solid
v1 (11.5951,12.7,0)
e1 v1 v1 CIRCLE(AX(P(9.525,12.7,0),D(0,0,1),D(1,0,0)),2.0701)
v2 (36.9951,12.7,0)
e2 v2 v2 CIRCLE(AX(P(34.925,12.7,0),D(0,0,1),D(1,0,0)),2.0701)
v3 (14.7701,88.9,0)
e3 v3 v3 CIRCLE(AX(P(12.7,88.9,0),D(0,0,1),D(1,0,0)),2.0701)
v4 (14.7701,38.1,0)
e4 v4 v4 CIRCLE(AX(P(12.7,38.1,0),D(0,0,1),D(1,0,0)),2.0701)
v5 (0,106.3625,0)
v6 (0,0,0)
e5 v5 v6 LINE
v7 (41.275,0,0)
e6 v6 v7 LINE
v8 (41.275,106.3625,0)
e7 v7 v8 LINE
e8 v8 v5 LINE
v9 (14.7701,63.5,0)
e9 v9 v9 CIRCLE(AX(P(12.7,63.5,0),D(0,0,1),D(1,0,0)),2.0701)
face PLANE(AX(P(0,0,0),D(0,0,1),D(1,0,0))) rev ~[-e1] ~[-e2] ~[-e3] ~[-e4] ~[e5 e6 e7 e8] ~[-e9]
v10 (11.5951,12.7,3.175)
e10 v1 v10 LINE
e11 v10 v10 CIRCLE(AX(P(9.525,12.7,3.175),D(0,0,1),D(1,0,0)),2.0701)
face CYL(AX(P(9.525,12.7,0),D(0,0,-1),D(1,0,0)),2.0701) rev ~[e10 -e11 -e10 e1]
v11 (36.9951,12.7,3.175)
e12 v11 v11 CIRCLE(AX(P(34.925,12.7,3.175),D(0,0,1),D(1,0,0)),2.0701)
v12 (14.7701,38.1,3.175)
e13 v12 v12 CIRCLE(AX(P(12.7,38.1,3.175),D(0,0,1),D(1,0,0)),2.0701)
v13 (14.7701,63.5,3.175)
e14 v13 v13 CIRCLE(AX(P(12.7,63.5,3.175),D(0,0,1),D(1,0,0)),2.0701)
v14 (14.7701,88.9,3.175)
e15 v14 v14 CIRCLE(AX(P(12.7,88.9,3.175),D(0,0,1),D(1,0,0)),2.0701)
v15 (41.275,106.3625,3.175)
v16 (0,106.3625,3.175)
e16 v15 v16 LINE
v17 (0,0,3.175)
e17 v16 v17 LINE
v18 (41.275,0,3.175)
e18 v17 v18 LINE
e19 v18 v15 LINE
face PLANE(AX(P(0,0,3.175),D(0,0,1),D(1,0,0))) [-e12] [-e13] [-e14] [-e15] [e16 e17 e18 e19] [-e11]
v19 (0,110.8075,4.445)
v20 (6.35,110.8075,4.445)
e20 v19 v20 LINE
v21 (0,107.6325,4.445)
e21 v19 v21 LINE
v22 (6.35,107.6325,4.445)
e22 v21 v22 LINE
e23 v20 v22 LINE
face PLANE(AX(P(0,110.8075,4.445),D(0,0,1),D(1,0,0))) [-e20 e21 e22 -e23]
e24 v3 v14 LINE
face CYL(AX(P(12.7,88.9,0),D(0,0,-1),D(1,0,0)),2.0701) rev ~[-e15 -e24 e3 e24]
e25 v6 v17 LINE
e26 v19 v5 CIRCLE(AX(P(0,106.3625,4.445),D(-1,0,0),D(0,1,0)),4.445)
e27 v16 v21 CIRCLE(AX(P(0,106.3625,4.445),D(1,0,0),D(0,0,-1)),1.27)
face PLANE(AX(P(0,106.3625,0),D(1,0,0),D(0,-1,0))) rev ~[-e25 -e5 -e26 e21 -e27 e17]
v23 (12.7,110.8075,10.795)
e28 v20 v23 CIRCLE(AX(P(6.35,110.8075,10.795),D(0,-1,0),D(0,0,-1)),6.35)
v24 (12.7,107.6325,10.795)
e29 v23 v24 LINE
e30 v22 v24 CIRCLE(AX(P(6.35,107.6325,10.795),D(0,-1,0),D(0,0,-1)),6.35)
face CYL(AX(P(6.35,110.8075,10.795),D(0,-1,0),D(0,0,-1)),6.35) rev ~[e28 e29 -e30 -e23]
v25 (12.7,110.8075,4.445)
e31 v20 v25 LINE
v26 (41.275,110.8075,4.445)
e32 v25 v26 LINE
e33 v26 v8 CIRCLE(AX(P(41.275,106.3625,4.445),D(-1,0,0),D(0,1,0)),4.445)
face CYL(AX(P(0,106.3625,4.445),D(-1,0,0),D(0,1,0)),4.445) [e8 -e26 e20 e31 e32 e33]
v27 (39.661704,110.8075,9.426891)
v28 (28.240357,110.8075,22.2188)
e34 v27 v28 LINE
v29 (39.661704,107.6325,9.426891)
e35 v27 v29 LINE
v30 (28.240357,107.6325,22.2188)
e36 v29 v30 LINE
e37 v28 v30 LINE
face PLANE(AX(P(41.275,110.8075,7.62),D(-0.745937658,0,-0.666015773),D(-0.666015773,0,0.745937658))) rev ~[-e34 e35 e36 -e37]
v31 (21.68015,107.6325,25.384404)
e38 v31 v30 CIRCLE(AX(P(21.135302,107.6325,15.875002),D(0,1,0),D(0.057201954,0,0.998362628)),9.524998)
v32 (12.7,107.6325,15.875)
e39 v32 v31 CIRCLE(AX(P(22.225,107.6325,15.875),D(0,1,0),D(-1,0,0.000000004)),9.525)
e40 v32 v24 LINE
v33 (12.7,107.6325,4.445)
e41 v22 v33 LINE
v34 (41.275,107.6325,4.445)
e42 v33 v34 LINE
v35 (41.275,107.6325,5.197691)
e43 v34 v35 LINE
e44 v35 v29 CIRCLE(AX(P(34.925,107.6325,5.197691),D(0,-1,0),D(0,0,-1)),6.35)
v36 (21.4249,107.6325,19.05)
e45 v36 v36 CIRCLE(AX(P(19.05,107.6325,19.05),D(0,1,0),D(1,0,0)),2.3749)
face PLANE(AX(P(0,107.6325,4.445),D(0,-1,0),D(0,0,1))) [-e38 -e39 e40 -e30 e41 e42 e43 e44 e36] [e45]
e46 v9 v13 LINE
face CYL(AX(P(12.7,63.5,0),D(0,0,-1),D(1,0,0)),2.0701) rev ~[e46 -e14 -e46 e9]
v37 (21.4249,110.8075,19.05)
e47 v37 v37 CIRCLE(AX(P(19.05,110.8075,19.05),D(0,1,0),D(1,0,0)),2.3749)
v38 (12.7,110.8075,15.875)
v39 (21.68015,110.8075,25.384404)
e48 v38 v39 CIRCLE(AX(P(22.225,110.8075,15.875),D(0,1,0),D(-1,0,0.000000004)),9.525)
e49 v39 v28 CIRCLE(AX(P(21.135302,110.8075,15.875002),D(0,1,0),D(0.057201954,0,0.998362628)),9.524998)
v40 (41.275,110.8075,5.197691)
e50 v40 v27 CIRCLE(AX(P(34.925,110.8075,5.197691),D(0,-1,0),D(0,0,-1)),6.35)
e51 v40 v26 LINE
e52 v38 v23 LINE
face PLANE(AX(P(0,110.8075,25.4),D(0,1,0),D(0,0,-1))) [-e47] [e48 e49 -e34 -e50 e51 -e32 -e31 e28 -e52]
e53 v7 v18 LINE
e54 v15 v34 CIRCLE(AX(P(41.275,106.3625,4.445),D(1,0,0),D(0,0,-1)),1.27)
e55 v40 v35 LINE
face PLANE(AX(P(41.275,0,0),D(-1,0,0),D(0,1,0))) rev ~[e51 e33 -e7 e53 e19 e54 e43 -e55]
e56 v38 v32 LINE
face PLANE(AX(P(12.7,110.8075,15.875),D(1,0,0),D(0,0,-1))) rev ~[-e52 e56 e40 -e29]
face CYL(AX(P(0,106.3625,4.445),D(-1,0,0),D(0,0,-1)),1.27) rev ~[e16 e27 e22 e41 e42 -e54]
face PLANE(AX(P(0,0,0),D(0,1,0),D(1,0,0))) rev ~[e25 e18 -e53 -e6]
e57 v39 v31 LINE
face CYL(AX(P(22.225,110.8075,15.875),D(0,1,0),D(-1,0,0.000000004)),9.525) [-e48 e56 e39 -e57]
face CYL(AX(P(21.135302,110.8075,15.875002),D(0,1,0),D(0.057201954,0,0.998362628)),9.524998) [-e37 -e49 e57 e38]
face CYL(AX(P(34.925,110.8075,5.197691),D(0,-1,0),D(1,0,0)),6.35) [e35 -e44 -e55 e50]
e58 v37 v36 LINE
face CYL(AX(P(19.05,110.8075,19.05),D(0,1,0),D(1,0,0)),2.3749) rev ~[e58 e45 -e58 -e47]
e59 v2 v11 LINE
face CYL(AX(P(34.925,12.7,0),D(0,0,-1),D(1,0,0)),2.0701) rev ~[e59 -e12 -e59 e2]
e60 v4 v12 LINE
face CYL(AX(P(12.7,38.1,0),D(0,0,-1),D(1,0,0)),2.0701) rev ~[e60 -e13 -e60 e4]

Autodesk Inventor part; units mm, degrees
ref_plane "YZ Plane" through (0, 0, 0) normal (1, 0, 0) x (0, 1, 0)
ref_plane "XZ Plane" through (0, 0, 0) normal (0, 1, 0) x (-1, 0, 0)
ref_plane "XY Plane" through (0, 0, 0) normal (0, 0, 1) x (1, 0, 0)
sketch "Sketch1 outline for Plate1" plane through (0, 0, 0) normal (0, 0, 1) x (1, 0, 0)
  line L0 (0, 106.3625) -> (0, 0)
  line L1 (41.275, 106.3625) -> (0, 106.3625)
  line L2 (0, 0) -> (41.275, 0)
  line L3 (41.275, 0) -> (41.275, 106.3625)
  circle A0 centre (9.525, 12.7) radius 2.0701
  circle A1 centre (12.7, 38.1) radius 2.0701
  circle A2 centre (34.925, 12.7) radius 2.0701
  circle A3 centre (12.7, 63.5) radius 2.0701
  circle A4 centre (12.7, 88.9) radius 2.0701
extrude "Plate1" add sketch "Sketch1 outline for Plate1" along normal blind 3.175
sketch "Sketch2" plane through (0, 107.6325, 4.445) normal (0, 1, 0) x (-1, 0, 0)
  line L0 (-41.275, 0) -> (0, 0)
  line L1 (0, 0) -> (0, 20.955)
  line L2 (0, 20.955) -> (-41.275, 20.955)
  line L3 (-41.275, 20.955) -> (-41.275, 0)
edge flange "Flange1" height 25.4 angle 90 thickness 3.175 bend radius 1.27 thickness toward (0, 1, 0) relief tear relief width 3.175 relief depth 1.5875 edges at (20.6375, 106.3625, 3.175) wall of the first edge with corners at (41.275, 107.6325, 4.445) (0, 107.6325, 4.445) (0, 107.6325, 25.4) (41.275, 107.6325, 25.4)
bend "Bend1"
corner "Corner1"
sketch "Sketch1" plane through (0, 0, 0) normal (0, 0, 1) x (1, 0, 0)
  line L0 (110.551814, -41.275) -> (0, -41.275)
  line L1 (110.551814, -34.925) -> (110.551814, -41.275)
  line L2 (0, 0) -> (111.304505, 0)
  line L3 (106.3625, 0) -> (110.551814, 0)
  line L4 (110.551814, 0) -> (110.551814, -3.175)
  line L5 (110.551814, -3.175) -> (106.3625, -3.175)
  line L6 (106.3625, -3.175) -> (106.3625, 0)
  line L7 (106.3625, 0) -> (106.3625, -41.275)
  line L8 (110.551814, 0) -> (110.551814, -34.925)
  line L9 (106.3625, -38.1) -> (110.551814, -38.1)
  line L10 (110.551814, -38.1) -> (110.551814, -41.275)
  line L11 (110.551814, -41.275) -> (106.3625, -41.275)
  line L12 (106.3625, -41.275) -> (106.3625, -38.1)
  dimension "d6" = 25.4
  dimension "d22" = 12.7
  dimension "d36" = 6.35
  dimension "d38" = 12.7
  dimension "d39" = 38.1
  dimension "d42" = 25.4
sketch "Sketch4" plane through (0, 110.8075, 25.4) normal (0, 1, 0) x (1, 0, 0)
  line L0 (41.275, 0) -> (0, 0)
  circle A0 centre (19.05, 6.35) radius 2.3749
  line L1 (0, 0) -> (0, 20.955)
  line L2 (0, 20.955) -> (41.275, 20.955)
  line L3 (41.275, 20.955) -> (41.275, 21.413463)
  line L4 (21.135301, 0) -> (22.225, 0)
  line L5 (0, 0) -> (0, 20.955)
  line L6 (41.275, 20.955) -> (0, 20.955)
  line L7 (41.275, 20.955) -> (41.275, 17.78)
  line L8 (41.275, 17.78) -> (28.240357, 3.1812)
  line L9 (12.7, 9.525) -> (12.7, 20.955)
  arc A1 (12.7, 9.525) -> (21.68015, 0.015596) centre (22.225, 9.525) ccw
  arc A2 (21.68015, 0.015596) -> (28.240357, 3.1812) centre (21.135301, 9.525) ccw
  line L10 (41.275, 20.955) -> (41.275, 0)
  line L11 (0, 0) -> (41.275, 0)
  line L12 (41.275, 0) -> (41.275, 20.955)
  point P0 (0, 25.4)
  point P1 (12.7, 0)
  point P2 (25.4, 0)
  point P3 (12.7, 0)
  dimension "d28" = 4.7498
  dimension "d29" = 6.35
  dimension "d34" = 19.05
  dimension "d47" = 3.175
  dimension "d48" = 6.35
  dimension "d49" = 6.35
  dimension "d50" = 9.525
extrude "Cut3" cut sketch "Sketch4" against normal blind 3.175 contours L0 L1 L2 L9 A1 A2 L8 L10 | A0
fillet "Fillet3" radius 6.35 2 edges at (41.275, 109.22, 7.62) (12.7, 109.22, 4.445)
equation "\"d51\" = Thickness"
equation "\"d12\" = BendReliefWidth"
equation "\"d13\" = BendReliefDepth"
equation "\"d14\" = MinimumRemnant"
equation "\"d15\" = BendRadius"
equation "\"d19\" = CornerReliefSize"
equation "\"d20\" = GapSize"
equation "\"d21\" = JacobiRadiusSize"
equation "\"BendRadius\" = Thickness"
equation "\"BendReliefWidth\" = Thickness"
equation "\"BendReliefDepth\" = 0.5 * Thickness"
equation "\"CornerReliefSize\" = 4 * Thickness"
equation "\"MinimumRemnant\" = 2 * Thickness"
equation "\"TransitionRadius\" = BendRadius"
equation "\"JacobiRadiusSize\" = BendRadius"
equation "\"GapSize\" = Thickness"
equation "\"d11\" = BendRadius"
equation "\"Thickness\" = 3.175"
properties part number "Pneumatic Piston Front Flange (Left Custom)" material "Aluminum 6061"
